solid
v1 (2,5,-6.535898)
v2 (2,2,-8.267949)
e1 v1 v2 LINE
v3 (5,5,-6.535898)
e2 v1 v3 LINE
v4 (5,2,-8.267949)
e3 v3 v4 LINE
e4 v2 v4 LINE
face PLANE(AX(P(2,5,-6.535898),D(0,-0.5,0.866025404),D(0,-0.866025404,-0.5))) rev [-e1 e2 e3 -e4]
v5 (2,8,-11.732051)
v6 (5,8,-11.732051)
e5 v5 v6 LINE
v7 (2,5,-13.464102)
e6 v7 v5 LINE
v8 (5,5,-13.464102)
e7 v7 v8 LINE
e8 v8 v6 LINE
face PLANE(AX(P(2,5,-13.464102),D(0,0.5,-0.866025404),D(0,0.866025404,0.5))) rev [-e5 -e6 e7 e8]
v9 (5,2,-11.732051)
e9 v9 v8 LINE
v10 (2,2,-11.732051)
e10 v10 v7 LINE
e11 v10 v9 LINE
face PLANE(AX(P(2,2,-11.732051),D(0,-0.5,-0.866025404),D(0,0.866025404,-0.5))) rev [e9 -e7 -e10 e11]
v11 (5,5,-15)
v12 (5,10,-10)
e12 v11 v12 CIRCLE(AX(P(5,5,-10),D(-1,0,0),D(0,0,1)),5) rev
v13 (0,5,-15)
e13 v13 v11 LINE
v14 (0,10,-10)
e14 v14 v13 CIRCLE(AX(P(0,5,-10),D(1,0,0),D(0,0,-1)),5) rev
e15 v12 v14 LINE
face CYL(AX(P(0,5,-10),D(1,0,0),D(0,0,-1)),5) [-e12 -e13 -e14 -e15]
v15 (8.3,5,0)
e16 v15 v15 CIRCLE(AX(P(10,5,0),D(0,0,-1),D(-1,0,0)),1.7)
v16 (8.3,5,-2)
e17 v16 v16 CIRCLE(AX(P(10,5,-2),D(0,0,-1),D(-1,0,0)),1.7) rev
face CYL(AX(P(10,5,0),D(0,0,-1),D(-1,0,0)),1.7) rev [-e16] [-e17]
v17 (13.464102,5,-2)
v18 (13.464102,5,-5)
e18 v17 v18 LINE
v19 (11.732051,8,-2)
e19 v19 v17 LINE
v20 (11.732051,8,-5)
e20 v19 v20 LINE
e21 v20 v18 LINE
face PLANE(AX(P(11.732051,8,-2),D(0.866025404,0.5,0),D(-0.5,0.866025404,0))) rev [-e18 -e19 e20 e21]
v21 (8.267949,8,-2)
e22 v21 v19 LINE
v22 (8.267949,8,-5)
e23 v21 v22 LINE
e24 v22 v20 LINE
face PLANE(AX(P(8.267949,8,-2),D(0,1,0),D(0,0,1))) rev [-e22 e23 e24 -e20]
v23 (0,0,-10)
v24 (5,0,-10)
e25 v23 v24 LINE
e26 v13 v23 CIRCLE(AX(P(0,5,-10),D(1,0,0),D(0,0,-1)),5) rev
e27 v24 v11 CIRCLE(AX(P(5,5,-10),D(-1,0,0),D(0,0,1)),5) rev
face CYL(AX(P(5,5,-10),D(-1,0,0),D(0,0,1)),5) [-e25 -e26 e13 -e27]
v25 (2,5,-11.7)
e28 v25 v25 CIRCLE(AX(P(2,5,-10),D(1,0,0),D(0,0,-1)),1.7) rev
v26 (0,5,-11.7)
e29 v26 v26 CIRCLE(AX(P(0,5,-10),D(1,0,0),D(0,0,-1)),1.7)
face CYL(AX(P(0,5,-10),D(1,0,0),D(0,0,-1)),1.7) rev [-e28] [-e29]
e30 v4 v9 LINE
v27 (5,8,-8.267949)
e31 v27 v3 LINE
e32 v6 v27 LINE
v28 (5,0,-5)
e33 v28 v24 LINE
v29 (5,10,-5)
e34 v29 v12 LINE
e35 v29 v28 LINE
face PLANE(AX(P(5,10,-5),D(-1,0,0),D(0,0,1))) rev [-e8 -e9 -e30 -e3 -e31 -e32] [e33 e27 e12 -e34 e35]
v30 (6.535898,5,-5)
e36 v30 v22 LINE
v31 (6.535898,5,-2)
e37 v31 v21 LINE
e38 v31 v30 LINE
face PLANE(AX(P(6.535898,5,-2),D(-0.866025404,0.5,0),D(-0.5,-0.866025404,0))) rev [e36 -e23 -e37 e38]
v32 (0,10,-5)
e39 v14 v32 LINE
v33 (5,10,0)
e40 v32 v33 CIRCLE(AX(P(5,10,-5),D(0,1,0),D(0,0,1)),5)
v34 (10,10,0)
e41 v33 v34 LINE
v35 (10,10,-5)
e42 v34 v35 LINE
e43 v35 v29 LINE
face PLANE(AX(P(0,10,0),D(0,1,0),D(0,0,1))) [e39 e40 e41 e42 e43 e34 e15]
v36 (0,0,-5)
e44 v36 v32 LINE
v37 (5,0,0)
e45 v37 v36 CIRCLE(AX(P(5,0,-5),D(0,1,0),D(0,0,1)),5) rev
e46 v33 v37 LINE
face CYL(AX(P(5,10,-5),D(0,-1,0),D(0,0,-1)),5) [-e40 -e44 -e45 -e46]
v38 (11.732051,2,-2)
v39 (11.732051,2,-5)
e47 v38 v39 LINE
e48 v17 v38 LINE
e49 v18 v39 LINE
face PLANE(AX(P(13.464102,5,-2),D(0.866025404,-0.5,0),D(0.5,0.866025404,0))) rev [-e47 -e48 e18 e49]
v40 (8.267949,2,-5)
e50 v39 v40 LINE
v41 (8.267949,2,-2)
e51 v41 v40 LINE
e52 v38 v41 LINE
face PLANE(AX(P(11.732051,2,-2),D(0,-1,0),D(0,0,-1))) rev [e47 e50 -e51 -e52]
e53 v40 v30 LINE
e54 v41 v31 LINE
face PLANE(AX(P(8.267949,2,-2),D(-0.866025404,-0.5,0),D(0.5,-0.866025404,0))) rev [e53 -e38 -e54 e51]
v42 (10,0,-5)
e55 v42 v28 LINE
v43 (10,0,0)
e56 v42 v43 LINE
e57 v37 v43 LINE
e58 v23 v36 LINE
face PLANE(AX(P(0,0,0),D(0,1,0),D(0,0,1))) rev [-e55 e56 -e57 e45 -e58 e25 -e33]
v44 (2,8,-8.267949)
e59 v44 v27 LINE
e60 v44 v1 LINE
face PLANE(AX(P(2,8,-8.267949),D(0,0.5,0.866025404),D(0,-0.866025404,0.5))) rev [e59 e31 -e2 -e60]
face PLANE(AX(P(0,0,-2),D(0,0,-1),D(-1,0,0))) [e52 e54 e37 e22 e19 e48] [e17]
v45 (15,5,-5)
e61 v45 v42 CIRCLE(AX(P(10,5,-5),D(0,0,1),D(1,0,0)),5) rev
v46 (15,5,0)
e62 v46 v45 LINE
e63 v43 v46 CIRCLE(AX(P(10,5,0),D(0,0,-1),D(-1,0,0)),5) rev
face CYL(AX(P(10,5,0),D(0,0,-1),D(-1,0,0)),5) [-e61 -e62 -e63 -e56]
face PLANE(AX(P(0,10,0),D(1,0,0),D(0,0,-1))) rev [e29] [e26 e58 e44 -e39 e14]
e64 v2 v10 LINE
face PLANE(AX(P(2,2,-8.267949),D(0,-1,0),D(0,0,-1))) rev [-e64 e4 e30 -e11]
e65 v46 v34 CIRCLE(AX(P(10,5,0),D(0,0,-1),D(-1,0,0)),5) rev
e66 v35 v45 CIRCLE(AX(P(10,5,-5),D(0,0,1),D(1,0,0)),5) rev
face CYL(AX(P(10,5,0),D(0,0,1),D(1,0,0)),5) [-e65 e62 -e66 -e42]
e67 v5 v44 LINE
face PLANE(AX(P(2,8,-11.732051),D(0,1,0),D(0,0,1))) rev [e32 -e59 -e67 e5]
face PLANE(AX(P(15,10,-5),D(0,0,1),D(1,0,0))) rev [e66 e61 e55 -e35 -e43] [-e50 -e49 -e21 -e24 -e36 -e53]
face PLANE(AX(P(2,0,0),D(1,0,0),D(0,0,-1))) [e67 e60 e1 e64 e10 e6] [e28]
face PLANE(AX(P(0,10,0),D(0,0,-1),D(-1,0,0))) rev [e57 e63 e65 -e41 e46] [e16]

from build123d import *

# Parameters (mm, degrees)
BOSS_EXTRUDE1_DEPTH = 10
SKETCH2_R           = 1.7
CUT_EXTRUDE1_DEPTH  = 21.615528128
SKETCH3_R           = 1.7
CUT_EXTRUDE2_DEPTH  = 21.615528128
CUT_EXTRUDE3_DEPTH  = 3
CUT_EXTRUDE4_DEPTH  = 3
FILLET1_R           = 5


with BuildPart() as part:
    # Sketch1 → Boss-Extrude1 (new body)
    with BuildSketch(Plane(origin=(0, 0, 0), x_dir=(1, 0, 0), z_dir=(0, 1, 0))):
        Polygon((0, 0), (0, 15), (5, 15), (5, 5), (15, 5), (15, 0), align=None)
    extrude(amount=BOSS_EXTRUDE1_DEPTH)

    # Sketch2 → Cut-Extrude1 (cut, through all)
    with BuildSketch(Plane(origin=(0, 0, -5), x_dir=(-1, 0, 0), z_dir=(0, 0, -1))):
        with Locations((-10, 5)):
            Circle(SKETCH2_R)
    extrude(amount=-CUT_EXTRUDE1_DEPTH, mode=Mode.SUBTRACT)

    # Sketch3 → Cut-Extrude2 (cut, through all)
    with BuildSketch(Plane(origin=(5, 0, 0), x_dir=(0, 0, -1), z_dir=(1, 0, 0))):
        with Locations((10, 5)):
            Circle(SKETCH3_R)
    extrude(amount=-CUT_EXTRUDE2_DEPTH, mode=Mode.SUBTRACT)

    # Sketch4 → Cut-Extrude3 (cut)
    with BuildSketch(Plane(origin=(5, 0, 0), x_dir=(0, 0, -1), z_dir=(1, 0, 0))):
        Polygon((13.464101615, 5), (11.732050808, 8), (8.267949192, 8), (6.535898385, 5), (8.267949192, 2), (11.732050808, 2), align=None)
    extrude(amount=-CUT_EXTRUDE3_DEPTH, mode=Mode.SUBTRACT)

    # Sketch5 → Cut-Extrude4 (cut)
    with BuildSketch(Plane(origin=(0, 0, -5), x_dir=(-1, 0, 0), z_dir=(0, 0, -1))):
        Polygon((-6.535898385, 5), (-8.267949192, 8), (-11.732050808, 8), (-13.464101615, 5), (-11.732050808, 2), (-8.267949192, 2), align=None)
    extrude(amount=-CUT_EXTRUDE4_DEPTH, mode=Mode.SUBTRACT)

    # Fillet1
    fillet1_edges = [part.edges().sort_by_distance(p)[0] for p in [
        (0, 5, 0),
        (15, 10, -2.5),
        (15, 0, -2.5),
        (2.5, 0, -15),
        (2.5, 10, -15),
    ]]
    fillet(fillet1_edges, radius=FILLET1_R - 0.0001)  # a hair under: the kernel refuses the full size


solid = part.part
